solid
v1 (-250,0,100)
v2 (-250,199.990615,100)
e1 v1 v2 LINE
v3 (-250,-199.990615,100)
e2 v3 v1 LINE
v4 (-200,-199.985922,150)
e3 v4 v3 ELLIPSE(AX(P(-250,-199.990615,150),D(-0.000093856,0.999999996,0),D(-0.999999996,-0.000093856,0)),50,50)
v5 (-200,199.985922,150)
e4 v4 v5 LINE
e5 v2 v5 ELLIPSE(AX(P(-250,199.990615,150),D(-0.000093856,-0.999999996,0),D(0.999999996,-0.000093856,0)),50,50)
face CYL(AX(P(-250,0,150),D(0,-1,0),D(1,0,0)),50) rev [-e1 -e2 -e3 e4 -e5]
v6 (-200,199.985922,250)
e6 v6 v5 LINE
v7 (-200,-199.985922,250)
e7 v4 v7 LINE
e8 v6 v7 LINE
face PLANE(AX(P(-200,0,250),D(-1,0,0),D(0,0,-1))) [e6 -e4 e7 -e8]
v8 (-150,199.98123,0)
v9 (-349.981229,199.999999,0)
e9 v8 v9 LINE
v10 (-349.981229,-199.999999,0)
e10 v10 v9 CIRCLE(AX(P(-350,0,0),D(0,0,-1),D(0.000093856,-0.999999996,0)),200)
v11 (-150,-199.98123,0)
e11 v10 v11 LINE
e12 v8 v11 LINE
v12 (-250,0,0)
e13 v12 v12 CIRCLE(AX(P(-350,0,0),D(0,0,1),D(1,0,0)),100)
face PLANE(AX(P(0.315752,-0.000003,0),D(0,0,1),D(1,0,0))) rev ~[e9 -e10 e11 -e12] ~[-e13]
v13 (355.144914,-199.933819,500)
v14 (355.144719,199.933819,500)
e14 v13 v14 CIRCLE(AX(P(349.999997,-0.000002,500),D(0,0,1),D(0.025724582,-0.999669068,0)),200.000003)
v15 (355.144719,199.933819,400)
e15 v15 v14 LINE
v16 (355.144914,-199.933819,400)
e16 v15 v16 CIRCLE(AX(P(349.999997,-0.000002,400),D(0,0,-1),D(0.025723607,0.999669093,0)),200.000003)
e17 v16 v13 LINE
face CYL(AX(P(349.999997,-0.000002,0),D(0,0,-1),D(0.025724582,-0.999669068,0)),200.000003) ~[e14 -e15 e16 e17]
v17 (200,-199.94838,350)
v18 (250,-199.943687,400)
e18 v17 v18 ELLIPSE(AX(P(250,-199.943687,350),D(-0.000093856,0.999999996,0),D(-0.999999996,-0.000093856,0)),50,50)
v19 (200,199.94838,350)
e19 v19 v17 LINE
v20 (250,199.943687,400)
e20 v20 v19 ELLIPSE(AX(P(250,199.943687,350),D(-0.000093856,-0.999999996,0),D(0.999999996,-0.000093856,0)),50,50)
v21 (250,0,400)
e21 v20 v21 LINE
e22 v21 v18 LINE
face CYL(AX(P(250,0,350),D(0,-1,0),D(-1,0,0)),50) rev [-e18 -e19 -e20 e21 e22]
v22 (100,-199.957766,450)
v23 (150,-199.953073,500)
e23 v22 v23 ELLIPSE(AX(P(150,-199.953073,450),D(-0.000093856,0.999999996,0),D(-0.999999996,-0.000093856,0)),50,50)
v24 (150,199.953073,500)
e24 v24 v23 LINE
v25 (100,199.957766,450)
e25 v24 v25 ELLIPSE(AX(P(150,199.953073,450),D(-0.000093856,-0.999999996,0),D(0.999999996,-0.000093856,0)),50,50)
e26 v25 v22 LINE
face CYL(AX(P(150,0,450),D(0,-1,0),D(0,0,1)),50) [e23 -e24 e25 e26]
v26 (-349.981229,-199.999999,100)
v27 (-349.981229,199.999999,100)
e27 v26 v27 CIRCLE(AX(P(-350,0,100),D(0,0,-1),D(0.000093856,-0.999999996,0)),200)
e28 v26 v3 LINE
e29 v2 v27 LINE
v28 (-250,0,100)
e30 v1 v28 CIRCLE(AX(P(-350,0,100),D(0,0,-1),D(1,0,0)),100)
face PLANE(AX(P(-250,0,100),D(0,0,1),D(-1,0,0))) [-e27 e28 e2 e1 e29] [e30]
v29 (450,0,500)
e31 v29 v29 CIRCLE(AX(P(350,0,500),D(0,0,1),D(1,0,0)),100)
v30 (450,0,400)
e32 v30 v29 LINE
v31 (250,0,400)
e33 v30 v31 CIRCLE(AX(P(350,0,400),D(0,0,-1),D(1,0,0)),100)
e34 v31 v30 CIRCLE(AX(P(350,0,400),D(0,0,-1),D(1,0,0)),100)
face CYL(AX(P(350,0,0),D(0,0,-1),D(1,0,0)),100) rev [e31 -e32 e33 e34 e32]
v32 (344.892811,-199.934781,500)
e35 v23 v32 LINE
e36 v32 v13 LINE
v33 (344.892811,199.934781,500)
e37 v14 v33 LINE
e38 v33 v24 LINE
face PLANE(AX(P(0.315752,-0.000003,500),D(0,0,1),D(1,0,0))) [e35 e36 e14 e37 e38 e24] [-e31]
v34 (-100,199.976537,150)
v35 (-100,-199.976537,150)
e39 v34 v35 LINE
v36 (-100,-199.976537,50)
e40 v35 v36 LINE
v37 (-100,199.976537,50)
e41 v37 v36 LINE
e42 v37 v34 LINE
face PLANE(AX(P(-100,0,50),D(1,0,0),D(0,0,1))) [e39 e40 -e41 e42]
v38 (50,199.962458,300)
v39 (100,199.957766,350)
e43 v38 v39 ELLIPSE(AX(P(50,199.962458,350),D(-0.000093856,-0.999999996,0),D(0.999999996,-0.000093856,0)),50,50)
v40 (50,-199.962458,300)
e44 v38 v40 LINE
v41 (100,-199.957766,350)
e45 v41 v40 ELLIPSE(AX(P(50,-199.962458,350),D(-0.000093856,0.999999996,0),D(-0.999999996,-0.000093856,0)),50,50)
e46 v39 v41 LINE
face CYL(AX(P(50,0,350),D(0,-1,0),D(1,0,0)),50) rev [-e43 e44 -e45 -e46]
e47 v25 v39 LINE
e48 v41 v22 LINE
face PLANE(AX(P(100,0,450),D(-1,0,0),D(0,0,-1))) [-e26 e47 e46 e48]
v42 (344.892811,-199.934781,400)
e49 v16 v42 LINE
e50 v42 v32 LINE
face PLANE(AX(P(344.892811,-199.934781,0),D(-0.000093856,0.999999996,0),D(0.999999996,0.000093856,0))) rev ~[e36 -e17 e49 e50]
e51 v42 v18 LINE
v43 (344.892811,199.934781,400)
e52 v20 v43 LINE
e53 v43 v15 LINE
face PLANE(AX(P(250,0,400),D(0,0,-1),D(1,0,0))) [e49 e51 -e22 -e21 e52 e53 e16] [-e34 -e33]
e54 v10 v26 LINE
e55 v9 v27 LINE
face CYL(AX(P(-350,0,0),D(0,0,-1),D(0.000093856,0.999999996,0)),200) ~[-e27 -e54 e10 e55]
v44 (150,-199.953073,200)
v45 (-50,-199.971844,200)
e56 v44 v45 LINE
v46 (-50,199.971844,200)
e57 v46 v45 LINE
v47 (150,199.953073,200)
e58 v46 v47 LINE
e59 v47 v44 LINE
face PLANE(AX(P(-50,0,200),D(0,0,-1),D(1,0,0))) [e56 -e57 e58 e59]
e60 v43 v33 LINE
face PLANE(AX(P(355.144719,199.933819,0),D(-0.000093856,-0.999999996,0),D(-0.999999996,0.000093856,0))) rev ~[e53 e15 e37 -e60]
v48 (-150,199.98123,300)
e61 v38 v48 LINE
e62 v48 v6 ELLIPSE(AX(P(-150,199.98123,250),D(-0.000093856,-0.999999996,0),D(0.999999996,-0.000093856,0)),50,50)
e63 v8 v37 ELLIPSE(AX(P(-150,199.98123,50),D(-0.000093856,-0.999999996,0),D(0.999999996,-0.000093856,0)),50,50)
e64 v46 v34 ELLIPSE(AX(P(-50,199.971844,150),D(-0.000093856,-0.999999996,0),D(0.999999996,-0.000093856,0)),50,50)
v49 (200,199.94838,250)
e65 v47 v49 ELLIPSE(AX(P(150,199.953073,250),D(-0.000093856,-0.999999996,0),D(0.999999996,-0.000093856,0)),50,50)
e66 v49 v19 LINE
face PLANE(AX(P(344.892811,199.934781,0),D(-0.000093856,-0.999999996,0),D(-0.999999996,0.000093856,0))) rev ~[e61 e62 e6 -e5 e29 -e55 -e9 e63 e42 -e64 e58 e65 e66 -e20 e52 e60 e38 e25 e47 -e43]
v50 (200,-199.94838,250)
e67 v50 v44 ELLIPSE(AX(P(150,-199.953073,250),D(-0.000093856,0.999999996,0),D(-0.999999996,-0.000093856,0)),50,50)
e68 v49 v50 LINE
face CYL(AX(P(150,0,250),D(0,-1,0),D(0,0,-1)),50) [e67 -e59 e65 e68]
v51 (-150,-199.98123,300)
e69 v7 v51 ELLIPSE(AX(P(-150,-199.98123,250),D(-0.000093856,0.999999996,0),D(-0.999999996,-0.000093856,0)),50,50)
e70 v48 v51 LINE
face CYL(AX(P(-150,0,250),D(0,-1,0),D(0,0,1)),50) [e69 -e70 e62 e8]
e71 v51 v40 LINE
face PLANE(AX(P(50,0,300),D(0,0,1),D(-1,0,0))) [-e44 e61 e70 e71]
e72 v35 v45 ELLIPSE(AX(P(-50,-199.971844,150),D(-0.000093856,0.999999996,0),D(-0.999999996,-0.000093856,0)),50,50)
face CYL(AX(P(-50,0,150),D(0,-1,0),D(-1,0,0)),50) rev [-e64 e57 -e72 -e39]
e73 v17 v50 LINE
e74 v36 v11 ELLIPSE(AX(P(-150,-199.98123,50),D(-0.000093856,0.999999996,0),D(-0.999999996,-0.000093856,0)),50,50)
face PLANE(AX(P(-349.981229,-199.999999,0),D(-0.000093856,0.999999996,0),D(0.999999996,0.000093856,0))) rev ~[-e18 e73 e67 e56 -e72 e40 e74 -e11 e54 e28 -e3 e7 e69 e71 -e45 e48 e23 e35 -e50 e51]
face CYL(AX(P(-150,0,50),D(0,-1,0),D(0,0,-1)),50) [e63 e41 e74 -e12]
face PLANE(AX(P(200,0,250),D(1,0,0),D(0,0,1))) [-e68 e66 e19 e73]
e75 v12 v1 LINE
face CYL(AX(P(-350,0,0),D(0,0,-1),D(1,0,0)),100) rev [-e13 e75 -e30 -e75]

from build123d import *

# Parameters (mm, degrees)
F0_R     = 100
F1_DEPTH = 500
F3_DEPTH = 300


# Not quite as in the source:
# - ends of sketch curves that miss each other by under 0.0002 mm in the source are joined


with BuildPart() as f1:
    # F0 (on Top) → F1 (new body)
    with BuildSketch(Plane.XY):
        with BuildLine():
            Line((344.892811266, 199.9347809243), (-349.9812287722, 199.9999991191))
            ThreePointArc((-349.9812287722, 199.9999991191), (-550, 0), (-349.9812287722, -199.9999991191))
            Line((-349.9812287722, -199.9999991191), (344.892811266, -199.9347809243))
            Line((344.892811266, -199.9347809243), (355.1449138709, -199.9338187015))
            ThreePointArc((355.1449138709, -199.9338187015), (550, 9.74749e-05), (355.1447188571, 199.9338187198))
            Line((355.1447188571, 199.9338187198), (344.892811266, 199.9347809243))
        make_face()
        with Locations((-350, 0)):
            Circle(F0_R, mode=Mode.SUBTRACT)
        with Locations((350, 0)):
            Circle(F0_R, mode=Mode.SUBTRACT)
    extrude(amount=F1_DEPTH)


with BuildPart() as f3:
    # F2 (on Front) → F3 (new body, symmetric)
    with BuildSketch(Plane.XZ):
        with BuildLine():
            Line((-550, 100), (-550, 0))
            Line((-550, 0), (-150, 0))
            ThreePointArc((-150, 0), (-114.6446609407, 14.6446609407), (-100, 50))
            Line((-100, 50), (-100, 150))
            ThreePointArc((-100, 150), (-85.3553390593, 185.3553390593), (-50, 200))
            Line((-50, 200), (150, 200))
            ThreePointArc((150, 200), (185.3553390593, 214.6446609407), (200, 250))
            Line((200, 250), (200, 350))
            ThreePointArc((200, 350), (214.6446609407, 385.3553390593), (250, 400))
            Line((250, 400), (550, 400))
            Line((550, 400), (550, 500))
            Line((550, 500), (150, 500))
            ThreePointArc((150, 500), (114.6446609407, 485.3553390593), (100, 450))
            Line((100, 450), (100, 350))
            ThreePointArc((100, 350), (85.3553390593, 314.6446609407), (50, 300))
            Line((50, 300), (-150, 300))
            ThreePointArc((-150, 300), (-185.3553390593, 285.3553390593), (-200, 250))
            Line((-200, 250), (-200, 150))
            ThreePointArc((-200, 150), (-214.6446609407, 114.6446609407), (-250, 100))
            Line((-250, 100), (-550, 100))
        make_face()
    extrude(amount=F3_DEPTH, both=True)


with BuildPart() as f1_1:
    add(f1.part)

    # F4: intersect F3
    add(f3.part, mode=Mode.INTERSECT)


solid = f1_1.part
